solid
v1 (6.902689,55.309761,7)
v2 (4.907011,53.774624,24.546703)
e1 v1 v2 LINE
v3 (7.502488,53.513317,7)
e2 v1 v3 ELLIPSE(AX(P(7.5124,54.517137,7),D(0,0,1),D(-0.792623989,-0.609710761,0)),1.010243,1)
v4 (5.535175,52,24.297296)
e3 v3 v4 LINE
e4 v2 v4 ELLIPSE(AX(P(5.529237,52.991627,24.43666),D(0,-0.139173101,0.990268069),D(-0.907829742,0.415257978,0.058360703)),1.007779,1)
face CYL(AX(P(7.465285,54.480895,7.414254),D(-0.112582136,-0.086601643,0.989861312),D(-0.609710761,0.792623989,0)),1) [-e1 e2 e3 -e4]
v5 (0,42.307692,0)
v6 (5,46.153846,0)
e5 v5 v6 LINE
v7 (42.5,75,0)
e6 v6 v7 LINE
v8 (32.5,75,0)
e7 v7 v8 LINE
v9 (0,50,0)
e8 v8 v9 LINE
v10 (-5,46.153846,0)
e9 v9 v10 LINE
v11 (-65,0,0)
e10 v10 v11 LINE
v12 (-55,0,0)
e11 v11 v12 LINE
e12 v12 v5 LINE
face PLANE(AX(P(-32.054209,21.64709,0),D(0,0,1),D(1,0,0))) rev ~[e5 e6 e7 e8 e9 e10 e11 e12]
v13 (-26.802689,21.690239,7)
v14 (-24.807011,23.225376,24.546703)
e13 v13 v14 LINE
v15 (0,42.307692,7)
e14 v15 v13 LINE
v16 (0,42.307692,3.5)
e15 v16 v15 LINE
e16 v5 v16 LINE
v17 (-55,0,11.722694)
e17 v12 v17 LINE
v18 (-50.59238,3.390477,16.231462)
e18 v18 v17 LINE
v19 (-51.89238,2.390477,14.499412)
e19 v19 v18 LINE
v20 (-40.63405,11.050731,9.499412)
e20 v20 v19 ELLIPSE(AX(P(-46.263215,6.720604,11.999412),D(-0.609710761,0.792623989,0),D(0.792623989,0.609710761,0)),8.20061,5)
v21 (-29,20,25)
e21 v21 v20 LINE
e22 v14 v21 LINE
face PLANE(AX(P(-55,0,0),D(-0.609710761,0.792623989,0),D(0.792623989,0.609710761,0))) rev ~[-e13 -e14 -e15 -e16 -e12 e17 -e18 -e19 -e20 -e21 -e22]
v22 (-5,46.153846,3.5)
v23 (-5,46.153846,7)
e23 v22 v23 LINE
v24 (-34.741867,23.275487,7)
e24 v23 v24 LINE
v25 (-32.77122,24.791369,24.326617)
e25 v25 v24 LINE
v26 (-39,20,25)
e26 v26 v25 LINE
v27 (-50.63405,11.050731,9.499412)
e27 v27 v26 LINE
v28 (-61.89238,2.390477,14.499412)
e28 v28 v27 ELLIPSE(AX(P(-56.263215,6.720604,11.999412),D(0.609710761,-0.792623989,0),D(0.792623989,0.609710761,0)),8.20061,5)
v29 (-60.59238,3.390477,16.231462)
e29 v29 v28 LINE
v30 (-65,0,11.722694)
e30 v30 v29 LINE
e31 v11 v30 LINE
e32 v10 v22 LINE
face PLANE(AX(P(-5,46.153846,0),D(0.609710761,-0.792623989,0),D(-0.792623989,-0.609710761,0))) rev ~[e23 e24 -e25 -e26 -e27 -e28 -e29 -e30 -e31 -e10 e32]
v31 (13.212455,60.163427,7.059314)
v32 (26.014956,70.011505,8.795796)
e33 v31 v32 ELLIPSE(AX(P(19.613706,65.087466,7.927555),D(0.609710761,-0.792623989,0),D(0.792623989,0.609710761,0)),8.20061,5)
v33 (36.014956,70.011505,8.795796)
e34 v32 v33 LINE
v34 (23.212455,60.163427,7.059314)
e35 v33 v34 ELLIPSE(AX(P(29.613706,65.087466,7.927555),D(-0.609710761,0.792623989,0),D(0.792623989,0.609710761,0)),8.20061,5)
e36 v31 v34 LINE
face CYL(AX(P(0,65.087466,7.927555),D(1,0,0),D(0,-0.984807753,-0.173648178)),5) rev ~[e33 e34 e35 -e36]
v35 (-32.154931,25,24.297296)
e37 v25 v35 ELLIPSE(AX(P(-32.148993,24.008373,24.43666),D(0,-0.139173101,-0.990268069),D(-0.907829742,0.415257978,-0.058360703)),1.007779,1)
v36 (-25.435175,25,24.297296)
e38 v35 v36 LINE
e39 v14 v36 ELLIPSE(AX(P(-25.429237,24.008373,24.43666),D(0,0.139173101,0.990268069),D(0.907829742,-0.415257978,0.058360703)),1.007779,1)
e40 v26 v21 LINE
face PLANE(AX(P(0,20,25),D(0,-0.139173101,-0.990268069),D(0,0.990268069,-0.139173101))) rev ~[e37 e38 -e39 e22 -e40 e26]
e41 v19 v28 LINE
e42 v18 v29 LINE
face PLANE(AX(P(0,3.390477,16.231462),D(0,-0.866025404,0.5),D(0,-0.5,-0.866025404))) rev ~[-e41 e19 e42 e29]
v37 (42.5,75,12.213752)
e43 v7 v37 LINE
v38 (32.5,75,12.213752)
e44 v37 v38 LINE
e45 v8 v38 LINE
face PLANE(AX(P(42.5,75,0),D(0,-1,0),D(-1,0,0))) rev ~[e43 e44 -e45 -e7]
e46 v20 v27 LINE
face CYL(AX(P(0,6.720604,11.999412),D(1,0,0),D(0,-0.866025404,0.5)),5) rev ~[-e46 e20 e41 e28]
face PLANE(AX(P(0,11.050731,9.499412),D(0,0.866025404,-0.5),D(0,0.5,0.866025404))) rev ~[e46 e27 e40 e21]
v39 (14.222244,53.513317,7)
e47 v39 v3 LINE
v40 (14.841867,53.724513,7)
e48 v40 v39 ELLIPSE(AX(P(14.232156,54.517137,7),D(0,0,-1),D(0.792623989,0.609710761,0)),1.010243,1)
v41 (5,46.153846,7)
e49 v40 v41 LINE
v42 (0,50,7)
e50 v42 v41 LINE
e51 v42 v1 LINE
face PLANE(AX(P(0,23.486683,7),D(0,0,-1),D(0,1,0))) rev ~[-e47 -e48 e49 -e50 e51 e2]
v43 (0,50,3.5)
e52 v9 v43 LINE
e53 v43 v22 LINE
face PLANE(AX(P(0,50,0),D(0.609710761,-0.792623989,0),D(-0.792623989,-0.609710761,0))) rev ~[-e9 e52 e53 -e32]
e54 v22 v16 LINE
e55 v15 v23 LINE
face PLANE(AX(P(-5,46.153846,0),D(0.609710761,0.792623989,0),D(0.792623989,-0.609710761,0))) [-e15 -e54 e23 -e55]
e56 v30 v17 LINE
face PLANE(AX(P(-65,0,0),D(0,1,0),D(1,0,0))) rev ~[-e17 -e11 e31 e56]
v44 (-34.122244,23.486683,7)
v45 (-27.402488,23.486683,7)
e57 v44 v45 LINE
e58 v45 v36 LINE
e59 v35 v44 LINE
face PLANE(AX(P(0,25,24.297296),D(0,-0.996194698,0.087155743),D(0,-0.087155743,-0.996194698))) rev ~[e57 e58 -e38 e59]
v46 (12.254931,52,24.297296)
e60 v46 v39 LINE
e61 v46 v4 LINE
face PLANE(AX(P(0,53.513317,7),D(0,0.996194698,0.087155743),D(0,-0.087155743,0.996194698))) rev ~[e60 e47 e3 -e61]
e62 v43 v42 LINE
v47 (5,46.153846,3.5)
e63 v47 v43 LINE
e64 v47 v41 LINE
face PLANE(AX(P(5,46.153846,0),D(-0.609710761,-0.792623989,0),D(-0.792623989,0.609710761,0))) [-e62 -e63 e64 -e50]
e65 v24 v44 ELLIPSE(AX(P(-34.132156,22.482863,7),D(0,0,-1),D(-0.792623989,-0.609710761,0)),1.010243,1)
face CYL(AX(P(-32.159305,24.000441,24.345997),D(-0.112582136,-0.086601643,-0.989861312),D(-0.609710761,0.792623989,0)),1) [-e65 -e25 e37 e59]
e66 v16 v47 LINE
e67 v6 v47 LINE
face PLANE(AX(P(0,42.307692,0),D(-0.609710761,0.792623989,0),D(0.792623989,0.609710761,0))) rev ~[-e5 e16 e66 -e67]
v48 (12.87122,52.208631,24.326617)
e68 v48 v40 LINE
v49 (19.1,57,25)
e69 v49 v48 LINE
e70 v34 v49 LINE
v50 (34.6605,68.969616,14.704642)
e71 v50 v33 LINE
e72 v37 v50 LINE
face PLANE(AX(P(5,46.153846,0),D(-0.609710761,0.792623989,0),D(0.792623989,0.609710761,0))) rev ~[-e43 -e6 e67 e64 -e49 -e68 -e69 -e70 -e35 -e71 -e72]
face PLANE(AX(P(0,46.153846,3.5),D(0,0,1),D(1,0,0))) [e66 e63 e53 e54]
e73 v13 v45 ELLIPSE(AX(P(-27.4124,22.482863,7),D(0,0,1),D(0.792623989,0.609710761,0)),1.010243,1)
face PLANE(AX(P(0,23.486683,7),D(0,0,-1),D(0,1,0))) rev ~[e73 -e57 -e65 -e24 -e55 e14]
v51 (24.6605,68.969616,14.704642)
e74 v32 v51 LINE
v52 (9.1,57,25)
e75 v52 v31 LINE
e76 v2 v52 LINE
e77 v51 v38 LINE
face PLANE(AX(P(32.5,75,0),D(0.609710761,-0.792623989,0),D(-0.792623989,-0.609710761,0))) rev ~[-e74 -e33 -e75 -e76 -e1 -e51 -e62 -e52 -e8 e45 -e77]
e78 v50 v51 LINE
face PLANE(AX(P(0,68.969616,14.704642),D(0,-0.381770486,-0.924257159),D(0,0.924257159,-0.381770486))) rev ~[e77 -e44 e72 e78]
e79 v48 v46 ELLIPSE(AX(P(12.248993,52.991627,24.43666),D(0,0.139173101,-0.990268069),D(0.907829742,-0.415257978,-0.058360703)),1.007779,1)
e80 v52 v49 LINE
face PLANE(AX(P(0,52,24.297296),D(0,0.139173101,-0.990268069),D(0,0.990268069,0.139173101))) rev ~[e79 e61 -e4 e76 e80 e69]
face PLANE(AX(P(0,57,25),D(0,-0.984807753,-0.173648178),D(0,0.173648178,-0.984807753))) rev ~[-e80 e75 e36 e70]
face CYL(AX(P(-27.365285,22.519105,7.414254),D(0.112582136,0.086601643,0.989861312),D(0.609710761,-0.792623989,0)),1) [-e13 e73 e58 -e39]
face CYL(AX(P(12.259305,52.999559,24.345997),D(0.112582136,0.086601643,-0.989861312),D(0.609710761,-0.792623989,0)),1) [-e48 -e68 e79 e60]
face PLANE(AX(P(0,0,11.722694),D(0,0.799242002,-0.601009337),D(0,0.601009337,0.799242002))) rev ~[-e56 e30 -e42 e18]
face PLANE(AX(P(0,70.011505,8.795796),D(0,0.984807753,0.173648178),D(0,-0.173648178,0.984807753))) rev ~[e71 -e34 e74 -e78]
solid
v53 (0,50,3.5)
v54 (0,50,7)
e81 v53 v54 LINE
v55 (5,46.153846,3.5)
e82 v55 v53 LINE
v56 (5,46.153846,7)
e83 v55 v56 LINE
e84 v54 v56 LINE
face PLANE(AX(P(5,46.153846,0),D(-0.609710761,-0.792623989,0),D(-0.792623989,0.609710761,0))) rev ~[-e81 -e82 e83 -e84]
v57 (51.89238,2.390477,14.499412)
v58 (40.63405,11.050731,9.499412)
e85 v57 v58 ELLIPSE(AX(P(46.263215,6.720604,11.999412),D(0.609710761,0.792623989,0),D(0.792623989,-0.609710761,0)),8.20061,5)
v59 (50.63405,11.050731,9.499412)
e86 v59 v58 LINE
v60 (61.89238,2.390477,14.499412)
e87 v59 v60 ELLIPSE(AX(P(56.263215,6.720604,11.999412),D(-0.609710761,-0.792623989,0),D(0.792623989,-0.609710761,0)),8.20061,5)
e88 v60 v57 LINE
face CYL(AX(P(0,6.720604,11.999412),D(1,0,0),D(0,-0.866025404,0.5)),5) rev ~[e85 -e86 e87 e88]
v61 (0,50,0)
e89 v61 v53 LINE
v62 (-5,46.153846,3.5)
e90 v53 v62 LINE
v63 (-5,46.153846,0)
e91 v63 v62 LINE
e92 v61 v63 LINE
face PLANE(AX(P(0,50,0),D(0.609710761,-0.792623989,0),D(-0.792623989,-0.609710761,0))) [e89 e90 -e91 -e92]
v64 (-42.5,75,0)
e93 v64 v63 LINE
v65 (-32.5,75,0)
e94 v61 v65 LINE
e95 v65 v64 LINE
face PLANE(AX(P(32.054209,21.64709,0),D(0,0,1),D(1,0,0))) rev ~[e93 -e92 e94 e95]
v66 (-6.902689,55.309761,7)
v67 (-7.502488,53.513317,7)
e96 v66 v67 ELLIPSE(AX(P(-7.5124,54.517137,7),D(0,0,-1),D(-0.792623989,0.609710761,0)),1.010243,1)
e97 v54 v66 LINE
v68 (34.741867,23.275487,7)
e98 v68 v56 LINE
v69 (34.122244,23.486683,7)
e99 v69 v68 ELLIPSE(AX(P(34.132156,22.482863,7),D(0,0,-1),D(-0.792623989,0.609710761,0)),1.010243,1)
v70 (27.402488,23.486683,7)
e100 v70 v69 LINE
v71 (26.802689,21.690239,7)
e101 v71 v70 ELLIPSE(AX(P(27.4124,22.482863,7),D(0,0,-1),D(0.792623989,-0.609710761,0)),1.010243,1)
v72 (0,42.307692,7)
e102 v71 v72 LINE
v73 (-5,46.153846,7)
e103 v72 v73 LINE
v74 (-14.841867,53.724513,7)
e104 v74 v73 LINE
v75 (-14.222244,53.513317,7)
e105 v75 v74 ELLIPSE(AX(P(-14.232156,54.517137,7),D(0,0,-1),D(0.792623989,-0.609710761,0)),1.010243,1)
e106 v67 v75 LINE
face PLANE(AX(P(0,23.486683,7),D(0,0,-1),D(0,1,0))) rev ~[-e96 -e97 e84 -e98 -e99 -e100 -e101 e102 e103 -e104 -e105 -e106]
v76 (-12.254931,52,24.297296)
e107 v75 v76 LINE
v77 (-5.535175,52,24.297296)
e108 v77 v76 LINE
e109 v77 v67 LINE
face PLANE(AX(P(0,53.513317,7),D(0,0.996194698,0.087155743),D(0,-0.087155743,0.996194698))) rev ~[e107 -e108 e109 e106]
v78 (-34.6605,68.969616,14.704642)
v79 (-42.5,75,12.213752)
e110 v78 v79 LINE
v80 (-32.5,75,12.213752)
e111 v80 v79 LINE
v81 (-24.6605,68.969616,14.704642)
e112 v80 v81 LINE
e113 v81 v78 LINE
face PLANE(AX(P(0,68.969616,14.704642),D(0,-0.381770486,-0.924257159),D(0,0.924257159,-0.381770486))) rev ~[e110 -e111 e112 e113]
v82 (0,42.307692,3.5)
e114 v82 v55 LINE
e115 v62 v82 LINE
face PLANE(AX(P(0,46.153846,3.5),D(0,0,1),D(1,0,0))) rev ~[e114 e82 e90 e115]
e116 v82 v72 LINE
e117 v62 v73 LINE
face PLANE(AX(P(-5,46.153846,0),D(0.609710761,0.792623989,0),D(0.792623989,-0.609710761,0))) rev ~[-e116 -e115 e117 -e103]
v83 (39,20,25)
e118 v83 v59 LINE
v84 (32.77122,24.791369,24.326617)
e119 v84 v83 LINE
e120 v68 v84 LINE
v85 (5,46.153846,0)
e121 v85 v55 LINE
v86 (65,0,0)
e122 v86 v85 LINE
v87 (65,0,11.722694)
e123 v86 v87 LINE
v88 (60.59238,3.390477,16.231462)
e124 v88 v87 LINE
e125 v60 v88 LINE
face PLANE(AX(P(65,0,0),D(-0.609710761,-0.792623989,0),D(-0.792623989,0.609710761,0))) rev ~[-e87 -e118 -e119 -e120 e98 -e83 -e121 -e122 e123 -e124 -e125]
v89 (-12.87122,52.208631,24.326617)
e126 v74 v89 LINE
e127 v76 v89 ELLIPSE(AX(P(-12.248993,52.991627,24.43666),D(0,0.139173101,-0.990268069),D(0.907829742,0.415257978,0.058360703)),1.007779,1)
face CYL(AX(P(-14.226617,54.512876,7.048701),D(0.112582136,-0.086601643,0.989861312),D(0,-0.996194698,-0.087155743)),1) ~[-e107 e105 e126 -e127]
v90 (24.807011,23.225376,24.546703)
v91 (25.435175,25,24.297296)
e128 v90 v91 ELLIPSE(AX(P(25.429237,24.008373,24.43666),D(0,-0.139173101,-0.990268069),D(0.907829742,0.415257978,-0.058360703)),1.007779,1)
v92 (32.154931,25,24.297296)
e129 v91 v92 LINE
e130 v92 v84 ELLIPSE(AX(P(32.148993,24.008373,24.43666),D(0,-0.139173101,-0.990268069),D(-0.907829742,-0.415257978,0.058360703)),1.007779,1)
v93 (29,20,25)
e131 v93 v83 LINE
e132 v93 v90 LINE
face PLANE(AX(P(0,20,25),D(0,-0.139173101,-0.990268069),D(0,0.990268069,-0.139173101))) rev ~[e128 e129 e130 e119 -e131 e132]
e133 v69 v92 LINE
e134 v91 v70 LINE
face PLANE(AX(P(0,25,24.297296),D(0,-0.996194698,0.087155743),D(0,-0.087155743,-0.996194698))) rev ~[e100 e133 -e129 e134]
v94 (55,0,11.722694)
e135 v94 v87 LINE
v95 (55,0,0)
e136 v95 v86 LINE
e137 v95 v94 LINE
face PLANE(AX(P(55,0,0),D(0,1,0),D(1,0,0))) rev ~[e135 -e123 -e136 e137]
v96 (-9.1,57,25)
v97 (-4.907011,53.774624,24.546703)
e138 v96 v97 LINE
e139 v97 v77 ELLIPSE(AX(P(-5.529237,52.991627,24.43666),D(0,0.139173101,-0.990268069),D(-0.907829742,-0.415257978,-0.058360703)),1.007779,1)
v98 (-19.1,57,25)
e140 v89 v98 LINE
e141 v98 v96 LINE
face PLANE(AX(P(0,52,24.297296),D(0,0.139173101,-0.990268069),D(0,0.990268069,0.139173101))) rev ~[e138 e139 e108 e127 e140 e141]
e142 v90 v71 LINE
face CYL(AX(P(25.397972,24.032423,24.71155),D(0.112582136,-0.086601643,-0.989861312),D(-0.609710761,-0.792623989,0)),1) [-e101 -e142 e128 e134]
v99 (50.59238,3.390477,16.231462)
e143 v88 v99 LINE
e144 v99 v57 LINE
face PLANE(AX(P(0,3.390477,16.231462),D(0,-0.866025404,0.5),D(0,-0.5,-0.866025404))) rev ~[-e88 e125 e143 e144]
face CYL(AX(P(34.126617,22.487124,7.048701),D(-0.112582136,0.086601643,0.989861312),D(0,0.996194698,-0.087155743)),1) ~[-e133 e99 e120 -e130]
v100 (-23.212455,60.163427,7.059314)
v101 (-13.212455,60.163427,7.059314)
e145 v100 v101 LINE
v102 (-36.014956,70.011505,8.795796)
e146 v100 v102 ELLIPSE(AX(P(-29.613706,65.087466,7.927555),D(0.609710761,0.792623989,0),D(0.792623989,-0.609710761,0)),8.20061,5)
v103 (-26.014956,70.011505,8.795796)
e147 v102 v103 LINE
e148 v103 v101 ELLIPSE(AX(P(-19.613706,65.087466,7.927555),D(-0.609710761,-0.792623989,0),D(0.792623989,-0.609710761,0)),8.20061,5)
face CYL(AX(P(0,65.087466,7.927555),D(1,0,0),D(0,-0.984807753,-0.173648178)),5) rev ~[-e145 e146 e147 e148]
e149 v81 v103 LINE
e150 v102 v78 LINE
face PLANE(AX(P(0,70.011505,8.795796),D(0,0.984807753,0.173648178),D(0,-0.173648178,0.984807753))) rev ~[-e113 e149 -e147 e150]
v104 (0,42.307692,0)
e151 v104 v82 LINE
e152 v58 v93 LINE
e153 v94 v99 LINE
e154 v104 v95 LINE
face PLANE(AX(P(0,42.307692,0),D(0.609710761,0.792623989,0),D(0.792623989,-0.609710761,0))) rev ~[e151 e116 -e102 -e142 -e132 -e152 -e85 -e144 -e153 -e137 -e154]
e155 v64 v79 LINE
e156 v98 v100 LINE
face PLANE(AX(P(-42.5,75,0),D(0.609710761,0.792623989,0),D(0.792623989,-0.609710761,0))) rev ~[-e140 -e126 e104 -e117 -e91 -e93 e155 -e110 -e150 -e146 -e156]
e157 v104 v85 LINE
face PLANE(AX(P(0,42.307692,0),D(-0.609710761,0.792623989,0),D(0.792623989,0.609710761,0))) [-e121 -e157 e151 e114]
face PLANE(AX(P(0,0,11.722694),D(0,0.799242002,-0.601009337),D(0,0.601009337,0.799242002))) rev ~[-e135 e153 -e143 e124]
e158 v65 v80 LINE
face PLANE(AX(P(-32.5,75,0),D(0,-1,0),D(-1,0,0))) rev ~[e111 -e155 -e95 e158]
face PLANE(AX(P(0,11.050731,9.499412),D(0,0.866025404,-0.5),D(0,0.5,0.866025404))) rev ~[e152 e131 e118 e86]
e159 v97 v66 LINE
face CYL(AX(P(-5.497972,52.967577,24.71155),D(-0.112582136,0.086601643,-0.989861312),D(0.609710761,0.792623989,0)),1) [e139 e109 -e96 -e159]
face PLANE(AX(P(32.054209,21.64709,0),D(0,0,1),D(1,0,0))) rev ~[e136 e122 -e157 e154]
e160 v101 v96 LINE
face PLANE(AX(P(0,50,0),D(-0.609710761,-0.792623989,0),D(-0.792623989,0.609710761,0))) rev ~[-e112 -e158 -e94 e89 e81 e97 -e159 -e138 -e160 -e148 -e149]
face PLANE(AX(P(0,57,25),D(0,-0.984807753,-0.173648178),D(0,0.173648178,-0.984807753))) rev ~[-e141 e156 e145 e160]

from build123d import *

# Parameters (mm, degrees)
F1_DEPTH      = 25
F2_DEPTH      = 25
F4_DEPTH      = 65.001
F4_DEPTH_BACK = 65.001
F5_DEPTH      = 3.5
F7_R          = 1
F7_2_R        = 1


# Not quite as in the source:
# - a feature of the source that left no trace in its solid (it failed there, or was rolled back) is left out


with BuildPart() as f1:
    # F0 (on Top) → F1 (new body)
    with BuildSketch(Plane.XY):
        Polygon((-65, 0), (-55, 0), (0, 42.3076923077), (-5, 46.1538461538), align=None)
        Polygon((-5, 46.1538461538), (0, 42.3076923077), (5, 46.1538461538), (0, 50), align=None)
        Polygon((0, 50), (5, 46.1538461538), (42.5, 75), (32.5, 75), align=None)
    extrude(amount=F1_DEPTH)


with BuildPart() as f2:
    # F0 (on Top) → F2 (new body)
    with BuildSketch(Plane.XY):
        Polygon((5, 46.1538461538), (0, 42.3076923077), (55, 0), (65, 0), align=None)
        Polygon((-42.5, 75), (-5, 46.1538461538), (0, 50), (-32.5, 75), align=None)
        Polygon((-5, 46.1538461538), (0, 42.3076923077), (5, 46.1538461538), (0, 50), align=None)
    extrude(amount=F2_DEPTH)


with BuildPart() as f4_tool:
    # F3 (on Right) → F4 (new body, two sides)
    with BuildSketch(Plane.YZ) as f4_sk:
        with BuildLine():
            Line((75, 25), (57, 25))
            Line((57, 25), (60.1634270419, 7.0593137296))
            ThreePointArc((60.1634270419, 7.0593137296), (65.9557066953, 3.0035158528), (70.011504572, 8.7957955062))
            Line((70.011504572, 8.7957955062), (68.969615506, 14.7046420243))
            Line((68.969615506, 14.7046420243), (75, 12.2137521295))
            Line((75, 12.2137521295), (75, 25))
        make_face()
        Polygon((57, 25), (20, 25), (25, 24.2972958265), (23.4866827055, 7), (53.5133172945, 7), (52, 24.2972958265), align=None)
        with BuildLine():
            Line((0, 11.7226943725), (3.390477077, 16.2314624079))
            Line((3.390477077, 16.2314624079), (2.390477077, 14.4994116003))
            ThreePointArc((2.390477077, 14.4994116003), (4.2206040959, 7.6692845814), (11.0507311148, 9.4994116003))
            Line((11.0507311148, 9.4994116003), (20, 25))
            Line((20, 25), (0, 25))
            Line((0, 25), (0, 11.7226943725))
        make_face()
    extrude(amount=F4_DEPTH)
    extrude(f4_sk.sketch, amount=-F4_DEPTH_BACK)


with BuildPart() as f1_1:
    add(f1.part)

    # F4: cut by f4_tool
    add(f4_tool.part, mode=Mode.SUBTRACT)


with BuildPart() as f2_1:
    add(f2.part)

    # F4: cut by f4_tool
    add(f4_tool.part, mode=Mode.SUBTRACT)

    # F0 (on Top) → F5 (cut)
    with BuildSketch(Plane.XY):
        Polygon((-5, 46.1538461538), (0, 42.3076923077), (5, 46.1538461538), (0, 50), align=None)
    extrude(amount=F5_DEPTH, mode=Mode.SUBTRACT)


with BuildPart() as f1_2:
    add(f1_1.part)

    # F6: cut F2
    add(f2_1.part, mode=Mode.SUBTRACT)

    # F7
    f7_edges = [f1_2.edges().sort_by_distance(p)[0] for p in [
        (-23.483656, 24.243341, 15.648648),
        (-33.483656, 24.243341, 15.648648),
        (3.583656, 52.756659, 15.648648),
        (13.583656, 52.756659, 15.648648),
    ]]
    fillet(f7_edges, radius=F7_R)


with BuildPart() as f2_2:
    add(f2_1.part)

    # F7#2
    f7_2_edges = [f2_2.edges().sort_by_distance(p)[0] for p in [
        (23.483656, 24.243341, 15.648648),
        (33.483656, 24.243341, 15.648648),
        (-13.583656, 52.756659, 15.648648),
        (-3.583656, 52.756659, 15.648648),
    ]]
    fillet(f7_2_edges, radius=F7_2_R)


solid = Compound([f1_2.part, f2_2.part])
